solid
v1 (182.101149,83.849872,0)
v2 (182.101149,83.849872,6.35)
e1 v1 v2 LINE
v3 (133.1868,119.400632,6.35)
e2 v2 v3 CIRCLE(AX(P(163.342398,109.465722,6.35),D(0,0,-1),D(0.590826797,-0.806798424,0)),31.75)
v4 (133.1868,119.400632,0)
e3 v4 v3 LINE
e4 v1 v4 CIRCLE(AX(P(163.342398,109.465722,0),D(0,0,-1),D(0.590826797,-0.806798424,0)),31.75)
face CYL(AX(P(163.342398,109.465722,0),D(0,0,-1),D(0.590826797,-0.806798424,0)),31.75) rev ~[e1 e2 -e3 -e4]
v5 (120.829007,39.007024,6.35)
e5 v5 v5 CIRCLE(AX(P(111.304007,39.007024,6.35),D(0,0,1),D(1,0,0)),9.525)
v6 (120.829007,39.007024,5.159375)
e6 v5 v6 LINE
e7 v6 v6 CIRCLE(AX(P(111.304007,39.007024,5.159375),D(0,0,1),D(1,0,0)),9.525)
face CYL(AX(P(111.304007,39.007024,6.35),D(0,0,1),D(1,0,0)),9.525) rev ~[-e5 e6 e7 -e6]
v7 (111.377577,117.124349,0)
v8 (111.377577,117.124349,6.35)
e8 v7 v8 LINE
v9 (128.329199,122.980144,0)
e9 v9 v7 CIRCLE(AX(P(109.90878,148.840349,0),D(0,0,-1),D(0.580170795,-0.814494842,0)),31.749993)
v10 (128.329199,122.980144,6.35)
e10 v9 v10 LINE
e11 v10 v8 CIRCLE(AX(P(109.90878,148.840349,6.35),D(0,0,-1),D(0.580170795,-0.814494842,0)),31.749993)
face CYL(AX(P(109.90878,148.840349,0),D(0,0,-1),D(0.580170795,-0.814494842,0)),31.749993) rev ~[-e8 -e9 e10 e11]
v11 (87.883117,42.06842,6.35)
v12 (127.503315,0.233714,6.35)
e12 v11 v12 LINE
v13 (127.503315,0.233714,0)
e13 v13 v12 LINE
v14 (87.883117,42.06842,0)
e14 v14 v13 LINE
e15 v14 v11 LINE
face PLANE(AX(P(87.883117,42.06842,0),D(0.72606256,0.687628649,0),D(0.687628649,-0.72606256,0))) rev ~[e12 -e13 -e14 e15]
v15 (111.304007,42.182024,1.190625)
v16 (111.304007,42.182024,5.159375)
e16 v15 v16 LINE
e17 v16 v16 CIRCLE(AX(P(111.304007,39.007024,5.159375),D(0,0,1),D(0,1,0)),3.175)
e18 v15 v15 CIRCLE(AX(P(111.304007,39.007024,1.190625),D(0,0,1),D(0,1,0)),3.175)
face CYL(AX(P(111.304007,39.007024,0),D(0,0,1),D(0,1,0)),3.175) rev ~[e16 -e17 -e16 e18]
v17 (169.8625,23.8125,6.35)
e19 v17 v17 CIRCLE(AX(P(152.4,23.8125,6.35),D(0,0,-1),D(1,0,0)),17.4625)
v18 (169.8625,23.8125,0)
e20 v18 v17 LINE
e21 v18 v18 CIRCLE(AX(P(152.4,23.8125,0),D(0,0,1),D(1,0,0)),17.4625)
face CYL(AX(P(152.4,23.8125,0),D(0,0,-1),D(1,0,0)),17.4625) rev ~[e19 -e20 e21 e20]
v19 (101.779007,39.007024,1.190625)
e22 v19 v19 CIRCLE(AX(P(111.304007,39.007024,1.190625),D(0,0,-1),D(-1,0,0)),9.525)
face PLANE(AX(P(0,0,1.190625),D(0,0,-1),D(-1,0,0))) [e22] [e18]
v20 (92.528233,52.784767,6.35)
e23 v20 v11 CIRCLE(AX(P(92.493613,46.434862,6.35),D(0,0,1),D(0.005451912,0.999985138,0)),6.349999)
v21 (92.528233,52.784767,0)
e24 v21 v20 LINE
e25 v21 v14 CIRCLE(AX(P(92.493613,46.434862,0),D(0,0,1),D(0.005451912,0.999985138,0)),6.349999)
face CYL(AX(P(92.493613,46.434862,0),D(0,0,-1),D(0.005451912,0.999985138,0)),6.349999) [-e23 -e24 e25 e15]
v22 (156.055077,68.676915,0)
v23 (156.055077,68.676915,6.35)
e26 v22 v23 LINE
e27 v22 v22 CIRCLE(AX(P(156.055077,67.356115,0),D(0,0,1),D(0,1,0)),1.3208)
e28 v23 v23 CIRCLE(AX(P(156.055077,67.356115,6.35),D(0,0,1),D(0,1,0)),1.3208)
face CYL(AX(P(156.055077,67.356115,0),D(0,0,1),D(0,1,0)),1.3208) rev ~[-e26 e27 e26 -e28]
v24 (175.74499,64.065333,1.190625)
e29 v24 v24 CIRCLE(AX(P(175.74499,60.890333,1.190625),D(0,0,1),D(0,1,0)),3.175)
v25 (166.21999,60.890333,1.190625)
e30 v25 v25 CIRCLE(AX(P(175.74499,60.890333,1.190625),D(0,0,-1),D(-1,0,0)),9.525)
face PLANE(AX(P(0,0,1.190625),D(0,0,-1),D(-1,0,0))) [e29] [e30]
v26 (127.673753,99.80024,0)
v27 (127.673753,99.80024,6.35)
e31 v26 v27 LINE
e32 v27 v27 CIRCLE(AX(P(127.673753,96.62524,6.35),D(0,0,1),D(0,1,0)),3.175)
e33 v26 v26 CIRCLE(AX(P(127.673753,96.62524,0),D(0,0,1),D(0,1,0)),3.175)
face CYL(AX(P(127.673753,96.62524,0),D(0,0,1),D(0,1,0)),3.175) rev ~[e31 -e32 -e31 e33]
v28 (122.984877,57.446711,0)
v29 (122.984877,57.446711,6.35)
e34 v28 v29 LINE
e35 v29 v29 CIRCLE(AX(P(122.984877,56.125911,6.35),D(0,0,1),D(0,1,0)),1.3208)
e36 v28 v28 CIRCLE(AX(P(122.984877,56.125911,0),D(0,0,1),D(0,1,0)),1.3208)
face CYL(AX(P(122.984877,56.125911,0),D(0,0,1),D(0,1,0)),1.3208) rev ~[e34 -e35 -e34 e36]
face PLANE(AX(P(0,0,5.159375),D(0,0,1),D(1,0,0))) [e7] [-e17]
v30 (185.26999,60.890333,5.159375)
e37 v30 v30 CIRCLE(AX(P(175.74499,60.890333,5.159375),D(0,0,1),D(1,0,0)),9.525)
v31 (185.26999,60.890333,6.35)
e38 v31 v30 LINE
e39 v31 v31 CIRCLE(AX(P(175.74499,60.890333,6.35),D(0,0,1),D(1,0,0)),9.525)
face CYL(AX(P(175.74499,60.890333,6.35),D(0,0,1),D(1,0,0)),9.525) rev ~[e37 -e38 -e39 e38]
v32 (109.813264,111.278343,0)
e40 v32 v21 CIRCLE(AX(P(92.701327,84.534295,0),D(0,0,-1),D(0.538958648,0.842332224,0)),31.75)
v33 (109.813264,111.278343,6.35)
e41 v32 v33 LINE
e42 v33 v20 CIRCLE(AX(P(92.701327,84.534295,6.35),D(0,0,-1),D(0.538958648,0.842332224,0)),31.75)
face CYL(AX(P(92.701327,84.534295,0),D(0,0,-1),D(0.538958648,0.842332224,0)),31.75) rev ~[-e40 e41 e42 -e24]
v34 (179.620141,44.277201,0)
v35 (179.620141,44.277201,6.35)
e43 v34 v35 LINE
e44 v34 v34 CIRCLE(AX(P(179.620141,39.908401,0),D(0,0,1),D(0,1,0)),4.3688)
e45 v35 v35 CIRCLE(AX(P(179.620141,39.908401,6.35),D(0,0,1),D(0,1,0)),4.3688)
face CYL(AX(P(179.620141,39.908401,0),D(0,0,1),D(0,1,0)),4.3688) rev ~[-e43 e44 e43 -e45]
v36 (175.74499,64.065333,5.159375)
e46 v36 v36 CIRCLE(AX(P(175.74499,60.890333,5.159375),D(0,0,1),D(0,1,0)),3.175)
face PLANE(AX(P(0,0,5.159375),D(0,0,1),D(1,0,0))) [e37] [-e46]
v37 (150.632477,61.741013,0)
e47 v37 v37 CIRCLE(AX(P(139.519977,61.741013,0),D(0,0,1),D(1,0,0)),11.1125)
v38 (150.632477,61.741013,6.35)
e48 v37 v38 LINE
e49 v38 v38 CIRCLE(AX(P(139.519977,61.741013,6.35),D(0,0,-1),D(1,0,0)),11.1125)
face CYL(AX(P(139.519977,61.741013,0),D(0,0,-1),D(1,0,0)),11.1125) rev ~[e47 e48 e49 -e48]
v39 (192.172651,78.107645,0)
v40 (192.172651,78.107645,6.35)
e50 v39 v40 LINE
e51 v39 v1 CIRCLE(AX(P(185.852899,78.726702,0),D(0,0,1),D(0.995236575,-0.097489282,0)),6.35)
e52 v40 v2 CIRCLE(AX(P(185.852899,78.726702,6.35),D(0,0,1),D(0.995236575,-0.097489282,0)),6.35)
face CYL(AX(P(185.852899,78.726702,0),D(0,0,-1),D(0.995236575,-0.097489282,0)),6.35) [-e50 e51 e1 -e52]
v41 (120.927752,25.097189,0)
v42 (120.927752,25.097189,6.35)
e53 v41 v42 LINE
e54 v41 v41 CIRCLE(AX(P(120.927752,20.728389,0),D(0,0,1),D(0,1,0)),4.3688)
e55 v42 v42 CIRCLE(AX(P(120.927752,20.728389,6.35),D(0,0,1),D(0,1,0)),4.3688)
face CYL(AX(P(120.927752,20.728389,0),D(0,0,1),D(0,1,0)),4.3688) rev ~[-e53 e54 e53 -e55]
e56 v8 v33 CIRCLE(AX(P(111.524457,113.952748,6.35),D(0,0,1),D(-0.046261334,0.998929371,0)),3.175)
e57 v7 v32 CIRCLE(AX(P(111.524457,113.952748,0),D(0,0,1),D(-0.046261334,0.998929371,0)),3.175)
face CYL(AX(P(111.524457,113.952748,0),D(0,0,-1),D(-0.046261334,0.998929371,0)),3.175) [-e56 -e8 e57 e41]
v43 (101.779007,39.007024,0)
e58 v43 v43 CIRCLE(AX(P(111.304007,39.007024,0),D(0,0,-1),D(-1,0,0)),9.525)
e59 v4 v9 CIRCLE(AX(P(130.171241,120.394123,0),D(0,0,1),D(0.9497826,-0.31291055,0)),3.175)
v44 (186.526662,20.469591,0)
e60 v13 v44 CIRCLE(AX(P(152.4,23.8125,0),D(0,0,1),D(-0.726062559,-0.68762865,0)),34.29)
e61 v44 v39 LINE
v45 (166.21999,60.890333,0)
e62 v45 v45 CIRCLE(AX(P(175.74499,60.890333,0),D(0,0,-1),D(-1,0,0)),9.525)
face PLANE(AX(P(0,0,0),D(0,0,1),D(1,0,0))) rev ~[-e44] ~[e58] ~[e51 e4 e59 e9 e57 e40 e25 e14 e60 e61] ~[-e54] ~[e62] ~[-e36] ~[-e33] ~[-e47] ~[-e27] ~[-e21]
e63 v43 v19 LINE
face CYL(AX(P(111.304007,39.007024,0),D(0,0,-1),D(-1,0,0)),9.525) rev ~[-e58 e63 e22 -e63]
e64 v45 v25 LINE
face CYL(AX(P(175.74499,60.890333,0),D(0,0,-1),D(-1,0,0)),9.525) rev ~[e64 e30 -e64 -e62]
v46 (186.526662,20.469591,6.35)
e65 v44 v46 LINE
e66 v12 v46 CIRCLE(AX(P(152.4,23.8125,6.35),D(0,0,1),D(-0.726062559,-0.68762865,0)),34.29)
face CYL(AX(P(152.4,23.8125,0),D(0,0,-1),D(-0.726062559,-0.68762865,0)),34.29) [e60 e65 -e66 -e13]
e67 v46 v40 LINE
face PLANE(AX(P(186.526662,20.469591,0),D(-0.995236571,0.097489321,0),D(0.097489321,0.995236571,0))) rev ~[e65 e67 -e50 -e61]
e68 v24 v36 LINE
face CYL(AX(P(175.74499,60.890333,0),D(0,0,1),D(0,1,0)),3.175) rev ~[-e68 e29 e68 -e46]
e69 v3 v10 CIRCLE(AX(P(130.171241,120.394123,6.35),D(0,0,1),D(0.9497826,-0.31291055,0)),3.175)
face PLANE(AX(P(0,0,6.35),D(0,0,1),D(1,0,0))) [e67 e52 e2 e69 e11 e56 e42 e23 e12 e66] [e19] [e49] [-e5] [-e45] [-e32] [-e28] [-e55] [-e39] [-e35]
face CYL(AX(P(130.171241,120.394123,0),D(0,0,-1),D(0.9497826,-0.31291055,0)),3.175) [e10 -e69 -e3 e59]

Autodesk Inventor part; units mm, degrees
ref_plane "YZ Plane" through (0, 0, 0) normal (1, 0, 0) x (0, 1, 0)
ref_plane "XZ Plane" through (0, 0, 0) normal (0, 1, 0) x (-1, 0, 0)
ref_plane "XY Plane" through (0, 0, 0) normal (0, 0, 1) x (1, 0, 0)
sketch "Sketch1" plane through (0, 0, 0) normal (0, 0, 1) x (1, 0, 0)
  line L0 (0, 0) -> (304.8, 0) construction
  line L1 (304.8, 0) -> (304.8, 50.8) construction
  line L2 (304.8, 50.8) -> (0, 50.8) construction
  line L3 (0, 50.8) -> (0, 0) construction
  circle A0 centre (152.4, 23.8125) radius 17.4625
  arc A1 (186.526662, 20.469591) -> (127.726757, 0) centre (152.4, 23.8125) ccw
  circle A2 centre (152.4, 23.8125) radius 26.035 construction
  line L4 (152.4, 23.8125) -> (139.519977, 61.741013) construction
  circle A3 centre (139.519977, 61.741013) radius 9.525 construction
  circle A4 centre (139.519977, 61.741013) radius 17.78 construction
  circle A5 centre (91.561866, 85.09) radius 31.75 construction
  arc A6 (133.1868, 119.400632) -> (182.101149, 83.849872) centre (163.342398, 109.465722) ccw
  circle A7 centre (109.531215, 150.050573) radius 31.75 construction
  line L5 (0, 50.8) -> (0, 53.34) construction
  line L6 (0, 53.34) -> (304.8, 53.34) construction
  line L7 (304.8, 53.34) -> (304.8, 50.8) construction
  circle A8 centre (139.519977, 61.741013) radius 21.59 construction
  circle A9 centre (152.4, 23.8125) radius 46.99 construction
  circle A10 centre (152.4, 23.8125) radius 50.8 construction
  arc A11 (86.386473, 79.456368) -> (92.43632, 92.689857) centre (91.561866, 85.09) ccw construction
  circle A12 centre (163.342398, 109.465722) radius 7.65 construction
  arc A13 (116.774938, 152.510446) -> (102.287492, 147.5907) centre (109.531215, 150.050573) ccw construction
  circle A14 centre (139.519977, 61.741013) radius 22.9 construction
  line L8 (86.386473, 79.456368) -> (124.027623, 44.87694) construction
  line L9 (170.878164, 108.148633) -> (162.078023, 57.798354) construction
  line L10 (92.43632, 92.689857) -> (91.561866, 85.09) construction
  line L11 (91.561866, 85.09) -> (86.386473, 79.456368) construction
  circle A15 centre (127.673753, 96.62524) radius 3.175 construction
  circle A16 centre (127.673753, 96.62524) radius 7.9375 construction
  line L12 (92.43632, 92.689857) -> (126.766436, 88.739767) construction
  line L13 (133.195304, 90.922926) -> (158.02084, 114.961496) construction
  line L14 (158.02084, 114.961496) -> (163.342398, 109.465722) construction
  line L15 (170.878164, 108.148633) -> (163.342398, 109.465722) construction
  line L16 (139.519977, 61.741013) -> (127.673753, 96.62524) construction
  line L17 (91.561866, 85.09) -> (163.342398, 109.465722) construction
  line L18 (152.4, 23.8125) -> (91.561866, 85.09) construction
  line L19 (152.4, 23.8125) -> (163.342398, 109.465722) construction
  circle A17 centre (127.673753, 96.62524) radius 9.2075 construction
  circle A18 centre (127.673753, 96.62524) radius 6.1595 construction
  arc A19 (92.43632, 92.689857) -> (86.386473, 79.456368) centre (91.561866, 85.09) ccw construction
  circle A20 centre (163.342398, 109.465722) radius 25.4 construction
  circle A21 centre (109.531215, 150.050573) radius 25.4 construction
  line L20 (104.762695, 113.965606) -> (78.361037, 56.214394) construction
  circle A22 centre (91.561866, 85.09) radius 25.4 construction
  line L21 (139.595033, 160.25985) -> (79.467396, 139.841297) construction
  circle A23 centre (139.519977, 61.741013) radius 11.1125
  arc A24 (100.13733, 146.057475) -> (119.680223, 151.623238) centre (109.908777, 148.840356) ccw construction
  line L22 (109.093738, 151.240444) -> (85.48016, 141.883152) construction
  line L23 (109.908777, 148.840356) -> (85.48016, 141.883152) construction
  line L24 (109.093738, 151.240444) -> (132.707317, 160.597736) construction
  line L25 (109.908777, 148.840356) -> (134.337393, 155.79756) construction
  arc A25 (134.92109, 161.474982) -> (130.493544, 159.72049) centre (132.707317, 160.597736) ccw construction
  arc A26 (132.047211, 155.145322) -> (136.627576, 156.449798) centre (134.337393, 155.79756) ccw construction
  arc A27 (132.047211, 155.145322) -> (130.493544, 159.72049) centre (85.48016, 141.883152) ccw construction
  arc A28 (136.627576, 156.449798) -> (134.92109, 161.474982) centre (85.48016, 141.883152) ccw construction
  line L26 (132.707317, 160.597736) -> (134.92109, 161.474982) construction
  line L27 (134.337393, 155.79756) -> (136.627576, 156.449798) construction
  arc A29 (119.680223, 151.623238) -> (118.53917, 154.983361) centre (85.48016, 141.883152) ccw construction
  arc A30 (100.13733, 146.057475) -> (99.648307, 147.497527) centre (85.48016, 141.883152) ccw construction
  line L28 (104.40145, 107.079075) -> (92.701327, 84.534295) construction
  line L29 (81.001203, 61.989515) -> (90.396097, 85.588158) construction
  arc A31 (100.671763, 111.399174) -> (98.91022, 106.974429) centre (99.790992, 109.186802) ccw construction
  arc A32 (103.304563, 104.965502) -> (105.498337, 109.192648) centre (104.40145, 107.079075) ccw construction
  arc A33 (103.304563, 104.965502) -> (98.91022, 106.974429) centre (81.001203, 61.989515) ccw construction
  line L30 (99.790992, 109.186802) -> (100.671763, 111.399174) construction
  line L31 (104.40145, 107.079075) -> (105.498337, 109.192648) construction
  arc A34 (105.498337, 109.192648) -> (100.671763, 111.399174) centre (81.001203, 61.989515) ccw construction
  arc A35 (118.53917, 154.983361) -> (99.648307, 147.497527) centre (109.093738, 151.240444) ccw construction
  arc A36 (88.021277, 75.516383) -> (97.381376, 93.552207) centre (92.701327, 84.534295) ccw construction
  line L32 (90.396097, 85.588158) -> (99.790992, 109.186802) construction
  line L33 (92.701327, 84.534295) -> (81.001203, 61.989515) construction
  arc A37 (88.021277, 75.516383) -> (86.63814, 76.148701) centre (81.001203, 61.989515) ccw construction
  arc A38 (97.381376, 93.552207) -> (94.154055, 95.027616) centre (81.001203, 61.989515) ccw construction
  arc A39 (94.154055, 95.027616) -> (86.63814, 76.148701) centre (90.396097, 85.588158) ccw construction
  line L34 (163.342398, 109.465722) -> (140.898549, 121.35831) construction
  line L35 (163.342398, 109.465722) -> (185.786247, 97.573135) construction
  circle A40 centre (139.519977, 61.741013) radius 22.9 construction
  arc A41 (102.287492, 147.5907) -> (116.774938, 152.510446) centre (109.531215, 150.050573) ccw construction
  arc A42 (102.287492, 147.5907) -> (102.622578, 146.765267) centre (109.531215, 150.050573) ccw construction
  circle A43 centre (90.396097, 85.588158) radius 31.75
  arc A44 (107.326481, 112.71527) -> (92.528233, 52.784767) centre (92.701327, 84.534295) ccw
  line L36 (100.671763, 111.399174) -> (102.139715, 115.086462) construction
  line L37 (105.498337, 109.192648) -> (107.326481, 112.71527) construction
  arc A45 (107.326481, 112.71527) -> (102.139715, 115.086462) centre (81.001203, 61.989515) ccw
  circle A46 centre (109.093738, 151.240444) radius 31.75
  arc A47 (120.148005, 118.786726) -> (128.329199, 122.980144) centre (109.908777, 148.840356) ccw
  line L38 (134.92109, 161.474982) -> (138.610711, 162.937059) construction
  line L39 (136.627576, 156.449798) -> (140.444547, 157.536861) construction
  arc A48 (140.444547, 157.536861) -> (138.610711, 162.937059) centre (85.48016, 141.883152) ccw
  line L40 (91.561866, 85.09) -> (109.531215, 150.050573) construction
  line L41 (109.531215, 150.050573) -> (163.342398, 109.465722) construction
  line L42 (139.519977, 61.741013) -> (109.531215, 150.050573) construction
  circle A49 centre (139.519977, 61.741013) radius 17.4625
  line L43 (139.519977, 61.741013) -> (122.984877, 56.125911) construction
  line L44 (139.519977, 61.741013) -> (156.055077, 67.356115) construction
  line L45 (139.519977, 61.741013) -> (156.055077, 67.356115) construction
  circle A50 centre (139.519977, 61.741013) radius 26.71 construction
  circle A51 centre (111.304007, 39.007024) radius 9.525 construction
  circle A52 centre (175.74499, 60.890333) radius 9.525 construction
  line L46 (0, 3.81) -> (304.8, 3.81) construction
  arc A53 (86.506583, 75.488588) -> (95.723262, 93.598122) centre (91.114923, 84.543355) ccw
  arc A54 (92.484334, 95.047874) -> (85.118472, 76.10991) centre (88.801403, 85.578892) ccw
  arc A55 (95.723262, 93.598122) -> (92.484334, 95.047874) centre (79.594076, 61.906436) ccw
  circle A56 centre (120.927752, 20.728389) radius 5.588
  circle A57 centre (179.620141, 39.908401) radius 5.588
  line L47 (152.4, 23.8125) -> (304.8, 25.4) construction
  line L48 (179.620141, 39.908401) -> (152.4, 23.8125) construction
  line L49 (152.4, 23.8125) -> (120.927752, 20.728389) construction
  line L50 (67.343611, 63.755949) -> (87.883117, 42.06842)
  line L51 (186.526662, 20.469591) -> (192.172651, 78.107645)
  arc A58 (109.813264, 111.278343) -> (111.377577, 117.124349) centre (111.524457, 113.952748) ccw
  arc A59 (128.329199, 122.980144) -> (133.1868, 119.400632) centre (130.171241, 120.394123) ccw
  arc A60 (111.377577, 117.124349) -> (120.148005, 118.786726) centre (109.908777, 148.840356) ccw
  arc A61 (128.329199, 122.980144) -> (111.377577, 117.124349) centre (109.908777, 148.840356) ccw
  arc A62 (137.993696, 128.583928) -> (133.1868, 119.400632) centre (163.342398, 109.465722) ccw
  arc A63 (109.813264, 111.278343) -> (107.326481, 112.71527) centre (92.701327, 84.534295) ccw
  arc A64 (92.528233, 52.784767) -> (87.883117, 42.06842) centre (92.493614, 46.434861) ccw
  arc A65 (182.101149, 83.849872) -> (192.172651, 78.107645) centre (185.852899, 78.726702) ccw
  arc A66 (192.172651, 78.107645) -> (182.101149, 83.849872) centre (185.852899, 78.726702) ccw
  arc A67 (97.105346, 50.8) -> (92.528233, 52.784767) centre (92.493614, 46.434861) ccw
  arc A68 (87.883117, 42.06842) -> (97.105346, 50.8) centre (92.493614, 46.434861) ccw
  line L52 (87.883117, 42.06842) -> (127.503315, 0.233714)
  line L53 (192.172651, 78.107645) -> (194.941159, 106.370436)
  arc A69 (182.101149, 83.849872) -> (137.993696, 128.583928) centre (163.342398, 109.465722) ccw
  arc A70 (180.251465, 3.81) -> (186.526662, 20.469591) centre (152.4, 23.8125) ccw
  arc A71 (127.726757, 0) -> (180.251465, 3.81) centre (152.4, 23.8125) ccw
  arc A72 (92.528233, 52.784767) -> (109.813264, 111.278343) centre (92.701327, 84.534295) ccw
  arc A73 (133.1868, 119.400632) -> (128.329199, 122.980144) centre (130.171241, 120.394123) ccw
  arc A74 (111.377577, 117.124349) -> (109.813264, 111.278343) centre (111.524457, 113.952748) ccw
  circle A75 centre (152.4, 23.8125) radius 10.208942
  point P0 (133.582269, 158.217994)
  point P1 (102.122529, 108.190485)
  dimension "d122" = 63.5
  dimension "d1" = 50.8
  dimension "d2" = 34.925
  dimension "d3" = 23.8125
  dimension "d4" = 152.4
  dimension "d7" = 68.58
  dimension "d8" = 52.07
  dimension "d9" = 19.05
  dimension "d10" = 35.56
  dimension "d11" = 40.0558
  dimension "d12" = 63.5
  dimension "d13" = 63.5
  dimension "d14" = 63.5
  dimension "d15" = 2.54
  dimension "d16" = 304.8
  dimension "d17" = 43.18
  dimension "d18" = 93.98
  dimension "d19" = 101.6
  dimension "d21" = 15.3
  dimension "d22" = 15.3
  dimension "d29" = 45.8
  dimension "d30" = 143.991
  dimension "d31" = 6.35
  dimension "d32" = 15.875
  dimension "d33" = 143.991
  dimension "d35" = 18.415
  dimension "d37" = 12.319
  dimension "d40" = 50.8
  dimension "d41" = 50.8
  dimension "d42" = 18.0044
  dimension "d43" = 18.0044
  dimension "d44" = 50.8
  dimension "d57" = 22.225
  dimension "d67" = 25.4
  dimension "d68" = 25.4
  dimension "d69" = 2.86
  dimension "d70" = 25.4
  dimension "d71" = 25.4
  dimension "d72" = 4.7625
  dimension "d75" = 2.86
  dimension "d80" = 4.7625
  dimension "d82" = 4.7625
  dimension "d83" = 50.8
  dimension "d84" = 50.8
  dimension "d85" = 10.16
  dimension "d97" = 48.41875
  dimension "d99" = 20.32
  dimension "d101" = 25.4
  dimension "d102" = 25.4
  dimension "d103" = 10.16
  dimension "d105" = 18.0044
  dimension "d106" = 18.0044
  dimension "d107" = 45.8
  dimension "d109" = 7.65
  dimension "d114" = 63.5
  dimension "d115" = 63.5
  dimension "d116" = 57.15
  dimension "d123" = 63.5
  dimension "d128" = 93.26256
  dimension "d129" = 34.925
  dimension "d130" = 0
  dimension "d138" = 53.42
  dimension "d139" = 19.05
  dimension "d140" = 19.05
  dimension "d154" = 3.81
sketch "Sketch1 outline for Plates" plane through (0, 0, 0) normal (0, 0, 1) x (1, 0, 0)
  arc A0 (111.377577, 117.124349) -> (109.813264, 111.278343) centre (111.524457, 113.952748) ccw
  arc A1 (109.813264, 111.278343) -> (92.528233, 52.784767) centre (92.701327, 84.534295) cw
  arc A2 (92.528233, 52.784767) -> (87.883117, 42.06842) centre (92.493614, 46.434861) ccw
  line L0 (87.883117, 42.06842) -> (127.503315, 0.233714)
  arc A3 (127.503315, 0.233714) -> (186.526662, 20.469591) centre (152.4, 23.8125) ccw
  line L1 (186.526662, 20.469591) -> (192.172651, 78.107645)
  arc A4 (192.172651, 78.107645) -> (182.101149, 83.849872) centre (185.852899, 78.726702) ccw
  arc A5 (182.101149, 83.849872) -> (133.1868, 119.400632) centre (163.342398, 109.465722) cw
  arc A6 (133.1868, 119.400632) -> (128.329199, 122.980144) centre (130.171241, 120.394123) ccw
  arc A7 (128.329199, 122.980144) -> (111.377577, 117.124349) centre (109.908777, 148.840356) cw
extrude "Plates" add sketch "Sketch1 outline for Plates" along normal blind 6.35
sketch "Sketch1 outline for Bearing Cuts" plane through (0, 0, 0) normal (0, 0, 1) x (1, 0, 0)
  circle A0 centre (139.519977, 61.741013) radius 11.1125
  circle A1 centre (152.4, 23.8125) radius 17.4625
extrude "Bearing Cuts" cut sketch "Sketch1 outline for Bearing Cuts" along normal blind 25.4
hole "Encoder Mounting Holes" at (122.984877, 56.125911, 0) at (156.055077, 67.356115, 0) direction (0, 0, 1) diameter 2.6416 end through all thread size "6-32 UNC" class "2B" standard "ANSI Unified Screw Threads"
hole "10-32 Pem Nut Holes" at (81.001203, 61.989515, 0) at (85.48016, 141.883152, 0) at (100.671763, 111.399174, 0) at (105.498337, 109.192648, 0) at (102.122529, 108.190485, 0) at (127.673753, 96.62524, 0) at (111.304007, 39.007024, 0) at (175.74499, 60.890333, 0) direction (0, 0, 1) diameter 6.35 end through all
hole "1/4-20 Pem Nut Holes" at (185.786247, 97.573135, 0) at (140.898549, 121.35831, 0) at (120.927752, 20.728389, 0) at (179.620141, 39.908401, 0) at (133.582269, 158.217994, 0) direction (0, 0, 1) diameter 8.7376 end through all
sketch "Sketch8" plane through (0, 0, 6.35) normal (0, 0, 1) x (1, 0, 0)
  circle A0 centre (111.304007, 39.007024) radius 3.175
  circle A1 centre (175.74499, 60.890333) radius 3.175
  circle A2 centre (111.304007, 39.007024) radius 9.525
  circle A3 centre (175.74499, 60.890333) radius 9.525
  point P0 (0, 0)
  dimension "d235" = 19.05
  dimension "d236" = 19.05
extrude "Extrusion5" cut sketch "Sketch8" against normal blind 1.190625
sketch "Sketch9" plane through (0, 0, 0) normal (0, 0, -1) x (-1, 0, 0)
  circle A0 centre (-111.304007, 39.007024) radius 3.175
  circle A1 centre (-175.74499, 60.890333) radius 3.175
  circle A2 centre (-175.74499, 60.890333) radius 9.525
  circle A3 centre (-179.620141, 39.908401) radius 4.3688
  circle A4 centre (-120.927752, 20.728389) radius 4.3688
  circle A5 centre (-111.304007, 39.007024) radius 3.175
  circle A6 centre (-127.673753, 96.62524) radius 3.175
  circle A7 centre (-175.74499, 60.890333) radius 3.175
  circle A8 centre (-122.984877, 56.125911) radius 1.3208
  circle A9 centre (-156.055077, 67.356115) radius 1.3208
  circle A10 centre (-152.4, 23.8125) radius 17.4625
  circle A11 centre (-139.519977, 61.741013) radius 11.1125
  arc A12 (-182.101149, 83.849872) -> (-192.172651, 78.107645) centre (-185.852899, 78.726702) ccw
  line L0 (-186.526662, 20.469591) -> (-192.172651, 78.107645)
  arc A13 (-186.526662, 20.469591) -> (-127.503315, 0.233714) centre (-152.4, 23.8125) ccw
  line L1 (-87.883117, 42.06842) -> (-127.503315, 0.233714)
  arc A14 (-87.883117, 42.06842) -> (-92.528233, 52.784767) centre (-92.493614, 46.434861) ccw
  arc A15 (-109.813264, 111.278343) -> (-92.528233, 52.784767) centre (-92.701327, 84.534295) ccw
  arc A16 (-109.813264, 111.278343) -> (-111.377577, 117.124349) centre (-111.524457, 113.952748) ccw
  arc A17 (-128.329199, 122.980144) -> (-111.377577, 117.124349) centre (-109.908777, 148.840356) ccw
  arc A18 (-128.329199, 122.980144) -> (-133.1868, 119.400632) centre (-130.171241, 120.394123) ccw
  arc A19 (-182.101149, 83.849872) -> (-133.1868, 119.400632) centre (-163.342398, 109.465722) ccw
  circle A20 centre (-111.304007, 39.007024) radius 9.525
  point P0 (0, 0)
extrude "Extrusion6" cut sketch "Sketch9" against normal blind 1.190625 contours A2 | A20
equation "\"d9\" = Gear15tPD"
equation "\"d10\" = Gear28tPD"
equation "\"d11\" = 0.5 * Gear48tPD + 0.5 * Gear15tPD + MeshingClearance"
equation "\"d12\" = CimOD"
equation "\"d13\" = CimOD"
equation "\"d14\" = CimOD"
equation "\"d17\" = Gear28tPD + ClearanceDiameter"
equation "\"d18\" = WheelOD"
equation "\"d19\" = WheelClearance"
equation "\"Pulley48tPD\" = 45.8"
equation "\"Pulley19tPD\" = 18.2"
equation "\"Pulley16tPD\" = 15.3"
equation "\"Gear15tPD\" = 19.05"
equation "\"Gear35tPD\" = 44.45"
equation "\"Gear48tPD\" = 60.96"
equation "\"Gear28tPD\" = 35.56"
equation "\"BearingLargeOD\" = 28.575"
equation "\"BearingSmallOD\" = 22.225"
equation "\"MeshingClearance\" = 0.0508"
equation "\"CimOD\" = 63.5"
equation "\"WheelOD\" = 93.98"
equation "\"ClearanceDiameter\" = 7.62"
equation "\"WheelClearance\" = 101.6"
equation "\"TensioningBearingID\" = 6.35"
equation "\"TensioningBearingOD\" = 15.875"
equation "\"SpingClipClearance\" = 8.89"
equation "\"Pi\" = 79.79645"
equation "\"Pulley56tPD\" = 53.5"
equation "\"BearingXLargeOD\" = 34.925"
properties part number "OutlineSketch1" material "Aluminum 6061"
